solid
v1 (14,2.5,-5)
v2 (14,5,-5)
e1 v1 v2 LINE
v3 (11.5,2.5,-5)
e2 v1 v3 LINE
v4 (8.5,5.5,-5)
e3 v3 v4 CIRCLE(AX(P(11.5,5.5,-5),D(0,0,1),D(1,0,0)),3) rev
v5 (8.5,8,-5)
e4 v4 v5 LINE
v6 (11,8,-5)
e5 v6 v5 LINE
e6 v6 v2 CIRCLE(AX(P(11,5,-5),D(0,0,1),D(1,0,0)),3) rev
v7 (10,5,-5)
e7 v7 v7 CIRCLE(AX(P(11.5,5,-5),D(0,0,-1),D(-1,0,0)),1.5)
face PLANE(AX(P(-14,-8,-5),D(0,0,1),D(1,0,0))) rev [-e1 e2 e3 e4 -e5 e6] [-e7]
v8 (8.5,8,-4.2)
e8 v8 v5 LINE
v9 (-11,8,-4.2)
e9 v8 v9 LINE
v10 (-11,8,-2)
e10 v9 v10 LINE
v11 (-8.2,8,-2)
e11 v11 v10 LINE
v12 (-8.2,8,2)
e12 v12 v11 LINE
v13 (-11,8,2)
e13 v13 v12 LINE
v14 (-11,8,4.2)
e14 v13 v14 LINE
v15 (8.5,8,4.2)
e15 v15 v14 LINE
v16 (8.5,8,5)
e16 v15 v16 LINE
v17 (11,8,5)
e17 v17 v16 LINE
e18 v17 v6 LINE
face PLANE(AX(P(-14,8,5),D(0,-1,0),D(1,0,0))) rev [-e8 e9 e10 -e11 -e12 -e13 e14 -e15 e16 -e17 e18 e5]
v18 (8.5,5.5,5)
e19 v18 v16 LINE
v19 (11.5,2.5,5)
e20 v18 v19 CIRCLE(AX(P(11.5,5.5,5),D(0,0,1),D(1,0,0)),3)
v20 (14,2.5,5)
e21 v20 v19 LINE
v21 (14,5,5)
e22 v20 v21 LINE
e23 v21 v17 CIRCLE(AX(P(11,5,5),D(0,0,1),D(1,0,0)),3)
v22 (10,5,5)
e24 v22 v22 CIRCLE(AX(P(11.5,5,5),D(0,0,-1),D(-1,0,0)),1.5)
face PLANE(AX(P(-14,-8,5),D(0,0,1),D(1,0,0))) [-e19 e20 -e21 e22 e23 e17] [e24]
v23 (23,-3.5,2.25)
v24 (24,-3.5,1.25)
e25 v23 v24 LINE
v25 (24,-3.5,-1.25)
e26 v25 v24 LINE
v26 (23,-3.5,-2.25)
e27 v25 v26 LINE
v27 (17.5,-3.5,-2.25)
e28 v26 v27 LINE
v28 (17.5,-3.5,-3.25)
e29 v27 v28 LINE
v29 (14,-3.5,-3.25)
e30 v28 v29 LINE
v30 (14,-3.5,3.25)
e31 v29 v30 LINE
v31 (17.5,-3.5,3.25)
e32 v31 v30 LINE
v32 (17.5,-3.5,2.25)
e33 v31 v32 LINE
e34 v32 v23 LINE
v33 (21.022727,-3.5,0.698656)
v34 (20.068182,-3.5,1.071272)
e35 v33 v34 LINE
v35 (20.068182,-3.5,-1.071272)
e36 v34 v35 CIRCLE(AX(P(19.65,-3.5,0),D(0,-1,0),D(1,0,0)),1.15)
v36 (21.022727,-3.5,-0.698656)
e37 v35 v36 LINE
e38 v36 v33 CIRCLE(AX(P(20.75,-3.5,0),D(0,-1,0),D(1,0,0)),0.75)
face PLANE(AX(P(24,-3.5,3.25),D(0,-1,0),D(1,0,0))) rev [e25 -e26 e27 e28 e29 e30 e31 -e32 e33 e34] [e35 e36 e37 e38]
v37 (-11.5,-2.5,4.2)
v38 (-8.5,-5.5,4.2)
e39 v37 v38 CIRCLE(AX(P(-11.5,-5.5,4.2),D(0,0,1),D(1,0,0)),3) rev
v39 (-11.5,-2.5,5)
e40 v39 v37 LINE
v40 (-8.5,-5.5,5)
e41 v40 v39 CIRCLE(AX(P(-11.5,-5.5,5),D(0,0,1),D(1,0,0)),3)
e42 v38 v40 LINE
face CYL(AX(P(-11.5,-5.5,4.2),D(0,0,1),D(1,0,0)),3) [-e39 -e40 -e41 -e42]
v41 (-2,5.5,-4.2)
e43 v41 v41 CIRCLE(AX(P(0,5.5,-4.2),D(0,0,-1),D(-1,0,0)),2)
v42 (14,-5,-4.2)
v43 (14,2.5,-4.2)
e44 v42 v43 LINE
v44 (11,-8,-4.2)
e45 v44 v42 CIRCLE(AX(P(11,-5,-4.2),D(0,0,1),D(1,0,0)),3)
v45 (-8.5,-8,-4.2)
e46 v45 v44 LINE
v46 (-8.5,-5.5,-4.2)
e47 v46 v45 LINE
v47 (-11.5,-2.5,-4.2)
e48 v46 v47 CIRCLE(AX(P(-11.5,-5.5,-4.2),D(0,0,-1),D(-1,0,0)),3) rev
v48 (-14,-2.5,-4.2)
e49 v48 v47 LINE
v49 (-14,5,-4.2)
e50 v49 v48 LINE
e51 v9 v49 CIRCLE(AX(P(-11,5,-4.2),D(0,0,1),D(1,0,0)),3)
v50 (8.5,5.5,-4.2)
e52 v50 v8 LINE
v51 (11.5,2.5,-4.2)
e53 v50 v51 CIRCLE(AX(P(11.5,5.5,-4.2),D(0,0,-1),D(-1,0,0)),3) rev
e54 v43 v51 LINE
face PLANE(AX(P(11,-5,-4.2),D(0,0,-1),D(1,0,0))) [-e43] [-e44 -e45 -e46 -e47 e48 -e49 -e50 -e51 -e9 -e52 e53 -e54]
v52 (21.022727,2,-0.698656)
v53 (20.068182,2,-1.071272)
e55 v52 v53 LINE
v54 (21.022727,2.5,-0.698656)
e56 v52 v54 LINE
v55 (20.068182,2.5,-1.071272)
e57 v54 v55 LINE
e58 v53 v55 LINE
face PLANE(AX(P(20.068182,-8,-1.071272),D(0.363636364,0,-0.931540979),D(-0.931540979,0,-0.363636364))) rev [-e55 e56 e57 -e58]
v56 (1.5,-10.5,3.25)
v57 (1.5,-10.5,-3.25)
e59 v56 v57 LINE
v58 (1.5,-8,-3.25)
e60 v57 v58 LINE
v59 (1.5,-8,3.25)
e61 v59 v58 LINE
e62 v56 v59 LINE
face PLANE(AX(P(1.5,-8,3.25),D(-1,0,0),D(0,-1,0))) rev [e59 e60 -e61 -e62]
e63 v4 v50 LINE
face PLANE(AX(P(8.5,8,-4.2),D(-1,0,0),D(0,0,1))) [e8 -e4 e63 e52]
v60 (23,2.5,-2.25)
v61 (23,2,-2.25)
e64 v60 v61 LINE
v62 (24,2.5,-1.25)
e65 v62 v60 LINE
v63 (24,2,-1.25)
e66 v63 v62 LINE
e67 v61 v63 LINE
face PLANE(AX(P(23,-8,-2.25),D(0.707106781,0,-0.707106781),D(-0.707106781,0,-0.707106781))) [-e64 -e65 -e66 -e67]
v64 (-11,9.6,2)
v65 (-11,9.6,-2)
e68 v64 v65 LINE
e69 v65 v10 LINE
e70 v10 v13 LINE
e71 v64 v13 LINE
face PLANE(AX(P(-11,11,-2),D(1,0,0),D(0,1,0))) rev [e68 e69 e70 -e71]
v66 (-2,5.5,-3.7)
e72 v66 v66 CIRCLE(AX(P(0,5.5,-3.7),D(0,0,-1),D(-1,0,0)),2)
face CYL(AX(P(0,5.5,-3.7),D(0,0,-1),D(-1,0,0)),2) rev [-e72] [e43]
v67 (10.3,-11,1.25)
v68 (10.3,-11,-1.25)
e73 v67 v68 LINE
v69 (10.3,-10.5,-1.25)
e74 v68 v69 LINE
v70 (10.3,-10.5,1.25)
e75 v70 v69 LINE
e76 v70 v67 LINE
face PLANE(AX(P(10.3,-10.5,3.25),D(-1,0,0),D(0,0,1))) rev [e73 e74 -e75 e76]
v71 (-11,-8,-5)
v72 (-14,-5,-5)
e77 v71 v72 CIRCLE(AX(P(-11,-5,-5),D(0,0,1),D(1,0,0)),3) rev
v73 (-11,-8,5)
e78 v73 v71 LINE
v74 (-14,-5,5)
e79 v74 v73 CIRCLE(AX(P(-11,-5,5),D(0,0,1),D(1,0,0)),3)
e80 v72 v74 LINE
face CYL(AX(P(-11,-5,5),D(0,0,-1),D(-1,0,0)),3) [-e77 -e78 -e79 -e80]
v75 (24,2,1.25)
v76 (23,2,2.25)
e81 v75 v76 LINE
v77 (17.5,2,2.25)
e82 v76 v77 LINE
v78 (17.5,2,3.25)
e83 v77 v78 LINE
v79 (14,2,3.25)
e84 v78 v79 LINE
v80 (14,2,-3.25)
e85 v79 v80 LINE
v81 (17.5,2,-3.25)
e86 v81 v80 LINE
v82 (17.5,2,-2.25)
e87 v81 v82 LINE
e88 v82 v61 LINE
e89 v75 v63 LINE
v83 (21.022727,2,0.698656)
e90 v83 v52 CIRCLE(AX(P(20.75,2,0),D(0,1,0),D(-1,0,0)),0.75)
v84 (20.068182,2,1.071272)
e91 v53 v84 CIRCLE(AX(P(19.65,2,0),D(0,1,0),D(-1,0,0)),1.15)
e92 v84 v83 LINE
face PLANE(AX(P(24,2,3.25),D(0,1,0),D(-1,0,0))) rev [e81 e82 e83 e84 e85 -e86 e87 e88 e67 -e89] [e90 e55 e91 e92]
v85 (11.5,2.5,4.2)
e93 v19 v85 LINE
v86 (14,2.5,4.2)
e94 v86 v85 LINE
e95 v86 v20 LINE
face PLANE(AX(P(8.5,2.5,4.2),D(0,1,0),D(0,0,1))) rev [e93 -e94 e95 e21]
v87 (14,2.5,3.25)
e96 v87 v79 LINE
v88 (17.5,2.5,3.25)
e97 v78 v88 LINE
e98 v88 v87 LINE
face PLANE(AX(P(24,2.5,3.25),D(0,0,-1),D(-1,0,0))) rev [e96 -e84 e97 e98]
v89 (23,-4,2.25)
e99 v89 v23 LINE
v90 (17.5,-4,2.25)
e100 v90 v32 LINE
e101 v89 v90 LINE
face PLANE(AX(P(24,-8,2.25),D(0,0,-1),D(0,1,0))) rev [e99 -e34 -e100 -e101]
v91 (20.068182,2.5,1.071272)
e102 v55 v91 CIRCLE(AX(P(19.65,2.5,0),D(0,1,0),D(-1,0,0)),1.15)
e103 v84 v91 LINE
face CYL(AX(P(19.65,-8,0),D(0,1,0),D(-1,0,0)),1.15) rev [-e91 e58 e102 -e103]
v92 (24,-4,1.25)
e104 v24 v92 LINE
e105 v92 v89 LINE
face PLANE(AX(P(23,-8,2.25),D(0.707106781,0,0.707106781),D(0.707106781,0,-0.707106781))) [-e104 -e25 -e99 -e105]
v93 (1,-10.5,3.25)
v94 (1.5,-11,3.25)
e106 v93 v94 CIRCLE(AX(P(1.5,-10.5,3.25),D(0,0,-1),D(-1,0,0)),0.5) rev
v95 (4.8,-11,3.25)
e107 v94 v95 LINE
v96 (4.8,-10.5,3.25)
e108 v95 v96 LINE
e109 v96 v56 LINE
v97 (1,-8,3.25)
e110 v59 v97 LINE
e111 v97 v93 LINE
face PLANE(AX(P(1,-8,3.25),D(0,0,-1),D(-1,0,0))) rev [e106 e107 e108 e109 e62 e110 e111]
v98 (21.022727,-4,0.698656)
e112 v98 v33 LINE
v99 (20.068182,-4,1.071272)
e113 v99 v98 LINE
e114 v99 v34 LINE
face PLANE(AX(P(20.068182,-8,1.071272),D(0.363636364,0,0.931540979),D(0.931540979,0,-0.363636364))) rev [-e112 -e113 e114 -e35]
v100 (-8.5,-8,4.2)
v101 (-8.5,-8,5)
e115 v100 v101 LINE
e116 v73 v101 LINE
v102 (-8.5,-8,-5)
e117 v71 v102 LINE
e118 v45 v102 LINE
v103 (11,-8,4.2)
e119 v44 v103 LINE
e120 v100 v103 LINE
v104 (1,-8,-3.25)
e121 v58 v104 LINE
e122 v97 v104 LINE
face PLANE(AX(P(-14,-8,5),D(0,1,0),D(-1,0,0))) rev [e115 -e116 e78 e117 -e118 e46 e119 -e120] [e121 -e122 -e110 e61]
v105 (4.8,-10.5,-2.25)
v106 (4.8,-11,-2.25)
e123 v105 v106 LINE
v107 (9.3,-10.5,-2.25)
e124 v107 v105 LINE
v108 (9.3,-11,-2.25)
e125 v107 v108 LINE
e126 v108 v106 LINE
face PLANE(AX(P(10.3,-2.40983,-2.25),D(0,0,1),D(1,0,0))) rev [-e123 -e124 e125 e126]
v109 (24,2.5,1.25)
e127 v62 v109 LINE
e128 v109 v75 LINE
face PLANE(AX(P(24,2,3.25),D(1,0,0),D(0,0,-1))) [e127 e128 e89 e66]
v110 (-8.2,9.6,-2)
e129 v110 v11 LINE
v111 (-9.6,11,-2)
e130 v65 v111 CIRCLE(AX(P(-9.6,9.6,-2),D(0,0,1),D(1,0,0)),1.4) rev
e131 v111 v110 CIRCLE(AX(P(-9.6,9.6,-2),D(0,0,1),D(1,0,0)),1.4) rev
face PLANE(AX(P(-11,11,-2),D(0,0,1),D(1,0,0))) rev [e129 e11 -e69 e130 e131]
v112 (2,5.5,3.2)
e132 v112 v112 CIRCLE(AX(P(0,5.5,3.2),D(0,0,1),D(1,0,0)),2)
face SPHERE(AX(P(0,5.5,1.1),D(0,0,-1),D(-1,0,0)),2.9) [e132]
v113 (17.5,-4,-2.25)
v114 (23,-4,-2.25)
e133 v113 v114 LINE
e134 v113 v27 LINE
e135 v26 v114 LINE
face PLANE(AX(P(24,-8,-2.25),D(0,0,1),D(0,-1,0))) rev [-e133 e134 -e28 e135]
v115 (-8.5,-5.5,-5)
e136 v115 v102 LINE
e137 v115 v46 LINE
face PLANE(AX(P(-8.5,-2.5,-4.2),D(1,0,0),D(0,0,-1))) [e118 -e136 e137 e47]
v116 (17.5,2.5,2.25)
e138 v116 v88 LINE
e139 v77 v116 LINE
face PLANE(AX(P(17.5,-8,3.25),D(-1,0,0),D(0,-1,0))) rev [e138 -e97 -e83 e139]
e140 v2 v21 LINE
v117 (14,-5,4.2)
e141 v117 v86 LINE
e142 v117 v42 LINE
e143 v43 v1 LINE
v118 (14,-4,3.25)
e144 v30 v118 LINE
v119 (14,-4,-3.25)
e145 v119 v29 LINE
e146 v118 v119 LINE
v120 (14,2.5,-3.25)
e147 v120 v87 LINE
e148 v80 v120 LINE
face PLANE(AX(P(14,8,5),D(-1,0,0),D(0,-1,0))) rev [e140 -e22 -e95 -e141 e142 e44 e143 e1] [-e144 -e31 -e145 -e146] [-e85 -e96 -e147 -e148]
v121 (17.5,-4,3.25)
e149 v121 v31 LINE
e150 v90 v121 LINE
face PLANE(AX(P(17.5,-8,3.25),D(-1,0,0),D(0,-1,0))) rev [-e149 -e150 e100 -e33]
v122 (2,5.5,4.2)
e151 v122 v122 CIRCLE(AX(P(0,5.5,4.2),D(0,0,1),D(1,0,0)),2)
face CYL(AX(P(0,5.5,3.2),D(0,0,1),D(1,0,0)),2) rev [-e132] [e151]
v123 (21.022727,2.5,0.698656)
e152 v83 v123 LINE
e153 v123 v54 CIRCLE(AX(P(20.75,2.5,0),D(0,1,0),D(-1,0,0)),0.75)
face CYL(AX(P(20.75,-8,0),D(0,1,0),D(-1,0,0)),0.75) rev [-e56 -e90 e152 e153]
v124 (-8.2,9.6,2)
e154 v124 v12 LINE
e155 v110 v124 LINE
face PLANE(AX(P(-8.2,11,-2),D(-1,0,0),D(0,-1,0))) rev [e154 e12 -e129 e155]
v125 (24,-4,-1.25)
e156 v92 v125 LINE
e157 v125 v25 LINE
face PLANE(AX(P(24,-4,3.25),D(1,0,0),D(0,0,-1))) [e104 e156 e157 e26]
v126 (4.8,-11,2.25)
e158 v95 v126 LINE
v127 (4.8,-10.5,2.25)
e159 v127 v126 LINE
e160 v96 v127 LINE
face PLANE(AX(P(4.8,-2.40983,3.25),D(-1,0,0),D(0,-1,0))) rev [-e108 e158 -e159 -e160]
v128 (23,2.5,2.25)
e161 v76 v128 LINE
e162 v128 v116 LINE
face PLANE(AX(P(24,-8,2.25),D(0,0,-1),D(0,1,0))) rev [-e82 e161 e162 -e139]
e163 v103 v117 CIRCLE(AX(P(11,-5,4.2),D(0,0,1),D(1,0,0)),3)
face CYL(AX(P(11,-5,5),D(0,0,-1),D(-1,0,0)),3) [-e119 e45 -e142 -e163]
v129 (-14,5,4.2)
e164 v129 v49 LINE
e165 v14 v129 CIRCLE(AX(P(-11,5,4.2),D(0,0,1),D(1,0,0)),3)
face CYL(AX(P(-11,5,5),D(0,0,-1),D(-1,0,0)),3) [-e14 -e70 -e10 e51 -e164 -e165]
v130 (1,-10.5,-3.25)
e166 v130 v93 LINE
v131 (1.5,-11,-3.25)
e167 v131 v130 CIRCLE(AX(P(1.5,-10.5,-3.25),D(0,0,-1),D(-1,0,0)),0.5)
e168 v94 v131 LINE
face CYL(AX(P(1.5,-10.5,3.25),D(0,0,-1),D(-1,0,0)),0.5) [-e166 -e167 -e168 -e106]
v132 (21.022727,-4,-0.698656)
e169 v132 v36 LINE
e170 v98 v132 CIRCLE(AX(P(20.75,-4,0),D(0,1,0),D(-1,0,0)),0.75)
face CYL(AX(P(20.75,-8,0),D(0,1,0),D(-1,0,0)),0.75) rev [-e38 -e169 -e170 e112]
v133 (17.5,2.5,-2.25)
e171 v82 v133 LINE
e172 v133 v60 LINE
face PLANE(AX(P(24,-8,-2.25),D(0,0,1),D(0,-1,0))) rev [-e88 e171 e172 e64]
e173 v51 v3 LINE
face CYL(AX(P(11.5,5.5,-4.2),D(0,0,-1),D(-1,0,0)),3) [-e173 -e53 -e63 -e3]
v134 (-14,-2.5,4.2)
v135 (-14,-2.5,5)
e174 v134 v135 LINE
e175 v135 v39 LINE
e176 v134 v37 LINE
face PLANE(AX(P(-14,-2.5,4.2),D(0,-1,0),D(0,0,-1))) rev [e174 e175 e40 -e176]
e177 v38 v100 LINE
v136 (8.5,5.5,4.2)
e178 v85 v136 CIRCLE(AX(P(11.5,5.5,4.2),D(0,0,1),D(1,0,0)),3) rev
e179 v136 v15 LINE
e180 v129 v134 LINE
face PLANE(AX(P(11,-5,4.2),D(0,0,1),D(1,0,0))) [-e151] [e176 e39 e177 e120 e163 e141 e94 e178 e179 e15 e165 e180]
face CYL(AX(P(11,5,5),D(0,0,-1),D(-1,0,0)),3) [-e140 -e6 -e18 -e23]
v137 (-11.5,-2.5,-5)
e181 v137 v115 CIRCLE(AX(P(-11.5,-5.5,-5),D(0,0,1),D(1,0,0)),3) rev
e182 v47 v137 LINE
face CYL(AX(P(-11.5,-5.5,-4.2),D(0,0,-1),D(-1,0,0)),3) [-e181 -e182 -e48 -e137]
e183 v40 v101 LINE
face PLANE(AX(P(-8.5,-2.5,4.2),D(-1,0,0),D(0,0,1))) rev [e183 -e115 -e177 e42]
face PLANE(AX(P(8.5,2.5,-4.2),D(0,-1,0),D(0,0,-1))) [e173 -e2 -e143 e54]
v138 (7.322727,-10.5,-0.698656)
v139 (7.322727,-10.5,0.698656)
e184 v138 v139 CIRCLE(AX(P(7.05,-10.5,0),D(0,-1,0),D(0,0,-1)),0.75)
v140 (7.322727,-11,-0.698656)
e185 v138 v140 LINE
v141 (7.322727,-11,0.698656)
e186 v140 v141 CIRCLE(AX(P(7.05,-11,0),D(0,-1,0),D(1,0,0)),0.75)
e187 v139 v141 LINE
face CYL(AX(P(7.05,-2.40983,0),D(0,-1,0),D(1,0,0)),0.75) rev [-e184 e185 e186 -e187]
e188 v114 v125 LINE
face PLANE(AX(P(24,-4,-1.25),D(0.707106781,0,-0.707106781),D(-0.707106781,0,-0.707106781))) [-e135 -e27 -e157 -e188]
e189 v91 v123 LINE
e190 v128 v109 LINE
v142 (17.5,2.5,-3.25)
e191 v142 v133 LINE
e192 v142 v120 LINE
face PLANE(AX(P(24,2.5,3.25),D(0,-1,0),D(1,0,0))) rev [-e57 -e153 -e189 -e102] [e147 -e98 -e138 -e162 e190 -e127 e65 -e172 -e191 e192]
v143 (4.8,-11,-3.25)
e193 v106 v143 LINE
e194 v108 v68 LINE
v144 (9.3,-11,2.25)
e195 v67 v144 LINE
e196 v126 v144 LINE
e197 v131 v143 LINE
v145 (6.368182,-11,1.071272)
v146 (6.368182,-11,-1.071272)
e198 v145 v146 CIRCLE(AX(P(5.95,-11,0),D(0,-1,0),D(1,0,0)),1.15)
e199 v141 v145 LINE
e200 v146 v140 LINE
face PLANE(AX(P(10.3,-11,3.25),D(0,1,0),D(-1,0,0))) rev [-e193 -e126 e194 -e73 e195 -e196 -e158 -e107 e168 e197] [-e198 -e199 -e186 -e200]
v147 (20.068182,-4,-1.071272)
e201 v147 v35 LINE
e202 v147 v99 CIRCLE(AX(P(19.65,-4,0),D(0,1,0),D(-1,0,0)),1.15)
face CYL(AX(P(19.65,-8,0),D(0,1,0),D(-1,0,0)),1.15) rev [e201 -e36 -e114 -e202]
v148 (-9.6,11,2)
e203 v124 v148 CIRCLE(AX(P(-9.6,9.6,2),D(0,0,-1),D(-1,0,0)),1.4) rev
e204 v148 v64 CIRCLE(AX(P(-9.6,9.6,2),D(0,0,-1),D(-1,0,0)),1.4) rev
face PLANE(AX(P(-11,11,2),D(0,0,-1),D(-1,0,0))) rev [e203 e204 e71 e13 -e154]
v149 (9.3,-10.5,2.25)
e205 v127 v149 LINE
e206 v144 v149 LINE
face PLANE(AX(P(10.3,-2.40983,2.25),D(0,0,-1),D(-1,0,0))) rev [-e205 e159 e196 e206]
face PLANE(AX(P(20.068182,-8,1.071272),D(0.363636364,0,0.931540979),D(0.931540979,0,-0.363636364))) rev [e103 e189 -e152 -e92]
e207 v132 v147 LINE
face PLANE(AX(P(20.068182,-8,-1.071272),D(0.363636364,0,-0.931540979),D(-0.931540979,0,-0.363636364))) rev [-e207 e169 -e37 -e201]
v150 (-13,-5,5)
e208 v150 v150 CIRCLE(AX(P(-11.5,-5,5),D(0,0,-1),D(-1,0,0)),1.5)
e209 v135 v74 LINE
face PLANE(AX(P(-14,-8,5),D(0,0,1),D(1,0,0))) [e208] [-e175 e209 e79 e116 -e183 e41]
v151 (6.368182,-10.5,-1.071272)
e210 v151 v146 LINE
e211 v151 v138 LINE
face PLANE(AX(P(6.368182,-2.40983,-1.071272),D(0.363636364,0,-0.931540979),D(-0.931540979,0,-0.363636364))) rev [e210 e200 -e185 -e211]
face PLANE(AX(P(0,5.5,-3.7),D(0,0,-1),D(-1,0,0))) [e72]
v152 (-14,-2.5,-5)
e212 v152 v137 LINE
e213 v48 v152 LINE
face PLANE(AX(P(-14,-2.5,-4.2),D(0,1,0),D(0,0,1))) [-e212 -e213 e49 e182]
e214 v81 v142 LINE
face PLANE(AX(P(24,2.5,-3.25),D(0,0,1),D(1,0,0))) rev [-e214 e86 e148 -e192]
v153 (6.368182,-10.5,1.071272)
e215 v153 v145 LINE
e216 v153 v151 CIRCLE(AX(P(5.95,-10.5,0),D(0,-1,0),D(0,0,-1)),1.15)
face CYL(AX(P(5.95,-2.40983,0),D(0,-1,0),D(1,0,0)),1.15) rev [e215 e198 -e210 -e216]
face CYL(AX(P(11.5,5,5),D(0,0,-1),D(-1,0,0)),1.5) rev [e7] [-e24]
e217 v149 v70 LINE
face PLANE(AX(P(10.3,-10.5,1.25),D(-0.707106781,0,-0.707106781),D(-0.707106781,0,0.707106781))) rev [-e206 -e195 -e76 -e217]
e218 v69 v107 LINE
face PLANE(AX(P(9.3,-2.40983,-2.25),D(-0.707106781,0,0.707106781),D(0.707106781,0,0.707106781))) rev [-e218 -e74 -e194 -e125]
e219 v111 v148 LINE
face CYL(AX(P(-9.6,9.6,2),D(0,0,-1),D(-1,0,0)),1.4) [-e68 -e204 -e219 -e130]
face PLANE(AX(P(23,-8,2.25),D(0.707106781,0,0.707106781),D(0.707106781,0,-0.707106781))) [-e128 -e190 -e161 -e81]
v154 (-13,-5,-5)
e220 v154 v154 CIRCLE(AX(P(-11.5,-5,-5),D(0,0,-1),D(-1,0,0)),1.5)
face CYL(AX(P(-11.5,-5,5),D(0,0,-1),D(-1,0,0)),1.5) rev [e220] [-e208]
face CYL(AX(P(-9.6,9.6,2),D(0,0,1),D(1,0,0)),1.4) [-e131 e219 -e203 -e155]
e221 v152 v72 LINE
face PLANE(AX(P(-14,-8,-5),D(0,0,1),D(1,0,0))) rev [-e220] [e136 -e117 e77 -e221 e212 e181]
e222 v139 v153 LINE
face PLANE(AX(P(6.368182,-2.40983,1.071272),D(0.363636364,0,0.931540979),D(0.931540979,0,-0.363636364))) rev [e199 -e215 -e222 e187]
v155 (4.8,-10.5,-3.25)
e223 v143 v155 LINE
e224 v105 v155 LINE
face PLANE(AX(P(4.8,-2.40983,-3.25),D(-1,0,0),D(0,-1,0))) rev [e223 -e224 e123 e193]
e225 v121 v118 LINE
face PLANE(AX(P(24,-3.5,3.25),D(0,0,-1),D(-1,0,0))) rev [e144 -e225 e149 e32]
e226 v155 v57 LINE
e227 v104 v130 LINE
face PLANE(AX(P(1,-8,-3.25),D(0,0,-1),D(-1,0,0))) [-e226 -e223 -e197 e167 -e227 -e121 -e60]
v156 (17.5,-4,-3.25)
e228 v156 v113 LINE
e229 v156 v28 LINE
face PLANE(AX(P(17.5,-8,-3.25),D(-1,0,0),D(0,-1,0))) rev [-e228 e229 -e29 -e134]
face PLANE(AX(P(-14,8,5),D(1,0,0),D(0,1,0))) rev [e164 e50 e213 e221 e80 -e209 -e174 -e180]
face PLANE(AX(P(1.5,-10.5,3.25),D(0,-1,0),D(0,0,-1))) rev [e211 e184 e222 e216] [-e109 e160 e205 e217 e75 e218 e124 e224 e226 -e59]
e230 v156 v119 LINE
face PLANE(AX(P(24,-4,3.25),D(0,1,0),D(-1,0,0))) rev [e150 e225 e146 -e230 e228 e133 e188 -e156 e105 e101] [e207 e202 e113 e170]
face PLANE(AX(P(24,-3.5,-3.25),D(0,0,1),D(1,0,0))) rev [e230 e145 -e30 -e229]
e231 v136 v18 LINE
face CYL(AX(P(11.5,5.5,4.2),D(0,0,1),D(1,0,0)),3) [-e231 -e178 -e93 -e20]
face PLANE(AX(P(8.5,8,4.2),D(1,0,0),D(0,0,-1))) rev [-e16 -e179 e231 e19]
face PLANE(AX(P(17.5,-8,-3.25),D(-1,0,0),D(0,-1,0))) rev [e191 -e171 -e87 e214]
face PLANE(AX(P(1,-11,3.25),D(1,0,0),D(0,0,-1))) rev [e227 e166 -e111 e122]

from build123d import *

# Parameters (mm, degrees)
SKETCH_1_W             = 28
SKETCH_1_H             = 16
EXTRUDE_1_DEPTH        = 5
FILLET_1_R             = 3
CUT_EXTRUDE_2_DEPTH    = 0.8
FILLET_2_R             = 3
FILLET_2_OF_MIRROR_1_R = 3
SKETCH_3_R             = 1.5
CUT_EXTRUDE_3_DEPTH    = 19.973665961
SKETCH_4_R             = 2
CUT_EXTRUDE_4_DEPTH    = 0.5
CUT_EXTRUDE_START      = -1
SKETCH_5_R             = 2
CUT_EXTRUDE_5_DEPTH    = 1
SKETCH_10_W            = 6.5
SKETCH_10_H            = 0.5
EXTRUDE_9_DEPTH        = 10
SKETCH_11_W            = 6.5
SKETCH_11_H            = 1
CUT_EXTRUDE_10_DEPTH   = 27.669270706
CHAMFER_1_SIZE         = 1
EXTRUDE_11_DEPTH       = 3.25
FILLET_7_R             = 0.5
SKETCH_13_W            = 5.5
SKETCH_13_H            = 1
CUT_EXTRUDE_12_DEPTH   = 3
CHAMFER_2_SIZE         = 1
SKETCH_14_W            = 2.8
SKETCH_14_H            = 4
EXTRUDE_13_DEPTH       = 3
FILLET_8_R             = 1.4


with BuildPart() as part:
    # 草圖1 → 伸長1 (new, symmetric)
    with BuildSketch(Plane.XY):
        Rectangle(SKETCH_1_W, SKETCH_1_H)
    extrude(amount=EXTRUDE_1_DEPTH, both=True)

    # 圓角1
    fillet_1_edges = [part.edges().sort_by_distance(p)[0] for p in [
        (-14, 8, 0),
        (14, 8, 0),
        (14, -8, 0),
        (-14, -8, 0),
    ]]
    fillet(fillet_1_edges, radius=FILLET_1_R)

    # 草圖2 → 伸長2 (cut)
    with BuildSketch(Plane.XY.offset(5)):
        with BuildLine():
            Line((-14, -2.5), (-8.5, -2.5))
            Line((-8.5, -2.5), (-8.5, -8))
            Line((-8.5, -8), (11, -8))
            ThreePointArc((11, -8), (13.121320344, -7.121320344), (14, -5))
            Line((14, -5), (14, 2.5))
            Line((14, 2.5), (8.5, 2.5))
            Line((8.5, 2.5), (8.5, 8))
            Line((8.5, 8), (-11, 8))
            ThreePointArc((-11, 8), (-13.121320344, 7.121320344), (-14, 5))
            Line((-14, 5), (-14, -2.5))
        make_face()
    cut_extrude_2 = extrude(amount=-CUT_EXTRUDE_2_DEPTH, mode=Mode.SUBTRACT)

    # 圓角2
    fillet_2_edges = [part.edges().sort_by_distance(p)[0] for p in [
        (8.5, 2.5, 4.6),
        (-8.5, -2.5, 4.6),
    ]]
    fillet(fillet_2_edges, radius=FILLET_2_R)

    # 鏡射1: 伸長2 across plane
    add(cut_extrude_2.mirror(Plane.XY), mode=Mode.SUBTRACT)

    # 圓角2 of 鏡射1
    fillet_2_of_mirror_1_edges = [part.edges().sort_by_distance(p)[0] for p in [
        (8.5, 2.5, -4.6),
        (-8.5, -2.5, -4.6),
    ]]
    fillet(fillet_2_of_mirror_1_edges, radius=FILLET_2_OF_MIRROR_1_R)

    # 草圖3 → 伸長3 (cut, through all)
    with BuildSketch(Plane(origin=(0, 0, -5), x_dir=(-1, 0, 0), z_dir=(0, 0, -1))):
        with Locations((-11.5, 5)):
            Circle(SKETCH_3_R)
        with Locations((11.5, -5)):
            Circle(SKETCH_3_R)
    extrude(amount=-CUT_EXTRUDE_3_DEPTH, mode=Mode.SUBTRACT)

    # 草圖4 → 伸長4 (cut)
    with BuildSketch(Plane(origin=(0, 0, -4.2), x_dir=(-1, 0, 0), z_dir=(0, 0, -1))):
        with Locations((0, 5.5)):
            Circle(SKETCH_4_R)
    extrude(amount=-CUT_EXTRUDE_4_DEPTH, mode=Mode.SUBTRACT)

    # 草圖5 → 伸長5 (cut)
    with BuildSketch(Plane.XY.offset(4.2).offset(CUT_EXTRUDE_START)):
        with Locations(Location((0, 5.5, 0), (0, 0, 180))):
            Circle(SKETCH_5_R)
    extrude(amount=CUT_EXTRUDE_5_DEPTH, mode=Mode.SUBTRACT)

    # 草圖9 → 旋轉1 (revolve)
    with BuildSketch(Plane(origin=(0, 5.5, 0), x_dir=(-1, 0, 0), z_dir=(0, 1, 0)), mode=Mode.PRIVATE) as revolve_1_sk:
        with BuildLine():
            Line((0, 3.2), (2, 3.2))
            ThreePointArc((2, 3.2), (1.077032961, 3.792582404), (0, 4))
            Line((0, 4), (0, 3.2))
        make_face()
    revolve(revolve_1_sk.sketch.rotate(Axis((0, 5.5, 3.2), (0, 0, 1)), 180), axis=Axis((0, 5.5, 3.2), (0, 0, 1)))

    # 草圖10 → 伸長9 (add)
    with BuildSketch(Plane(origin=(14, 0, 0), x_dir=(0, 0, -1), z_dir=(1, 0, 0))):
        with Locations((0, -3.75)):
            Rectangle(SKETCH_10_W, SKETCH_10_H)
        with Locations((0, 2.25)):
            Rectangle(SKETCH_10_W, SKETCH_10_H)
    extrude(amount=EXTRUDE_9_DEPTH)

    # 草圖11 → 伸長10 (cut, through all)
    with BuildSketch(Plane(origin=(0, 2.5, 0), x_dir=(1, 0, 0), z_dir=(0, 1, 0))):
        with BuildLine():
            Line((20.068181818, 1.071272126), (21.022727273, 0.698655734))
            ThreePointArc((21.022727273, 0.698655734), (21.5, 0), (21.022727273, -0.698655734))
            Line((21.022727273, -0.698655734), (20.068181818, -1.071272126))
            ThreePointArc((20.068181818, -1.071272126), (18.5, 0), (20.068181818, 1.071272126))
        make_face()
        with Locations((20.75, 2.75)):
            Rectangle(SKETCH_11_W, SKETCH_11_H)
        with Locations((20.75, -2.75)):
            Rectangle(SKETCH_11_W, SKETCH_11_H)
    extrude(amount=-CUT_EXTRUDE_10_DEPTH, mode=Mode.SUBTRACT)

    # 導角1
    chamfer_1_edges = [part.edges().sort_by_distance(p)[0] for p in [
        (24, 2.25, -2.25),
        (24, -3.75, -2.25),
        (24, 2.25, 2.25),
        (24, -3.75, 2.25),
    ]]
    chamfer(chamfer_1_edges, length=CHAMFER_1_SIZE)

    # 草圖12 → 伸長11 (add, symmetric)
    with BuildSketch(Plane.XY):
        Polygon((1, -8), (1.5, -8), (1.5, -10.5), (10.3, -10.5), (10.3, -11), (1, -11), align=None)
    extrude(amount=EXTRUDE_11_DEPTH, both=True)

    # 圓角7
    fillet_7_edges = [part.edges().sort_by_distance(p)[0] for p in [
        (1, -11, 0),
    ]]
    fillet(fillet_7_edges, radius=FILLET_7_R)

    # 草圖13 → 伸長12 (cut)
    with BuildSketch(Plane.XZ.offset(11)):
        with Locations((7.55, 2.75)):
            Rectangle(SKETCH_13_W, SKETCH_13_H)
        with Locations((7.55, -2.75)):
            Rectangle(SKETCH_13_W, SKETCH_13_H)
        with BuildLine():
            Line((6.368181818, 1.071272126), (7.322727273, 0.698655734))
            ThreePointArc((7.322727273, 0.698655734), (7.8, 0), (7.322727273, -0.698655734))
            Line((7.322727273, -0.698655734), (6.368181818, -1.071272126))
            ThreePointArc((6.368181818, -1.071272126), (4.8, 0), (6.368181818, 1.071272126))
        make_face()
    extrude(amount=-CUT_EXTRUDE_12_DEPTH, mode=Mode.SUBTRACT)

    # 導角2
    chamfer_2_edges = [part.edges().sort_by_distance(p)[0] for p in [
        (10.3, -10.75, 2.25),
        (10.3, -10.75, -2.25),
    ]]
    chamfer(chamfer_2_edges, length=CHAMFER_2_SIZE)

    # 草圖14 → 伸長13 (add)
    with BuildSketch(Plane(origin=(0, 8, 0), x_dir=(1, 0, 0), z_dir=(0, 1, 0))):
        with Locations((-9.6, 0)):
            Rectangle(SKETCH_14_W, SKETCH_14_H)
    extrude(amount=EXTRUDE_13_DEPTH)

    # 圓角8
    fillet_8_edges = [part.edges().sort_by_distance(p)[0] for p in [
        (-8.2, 11, 0),
        (-11, 11, 0),
    ]]
    fillet(fillet_8_edges, radius=FILLET_8_R - 0.0001)  # a hair under: the kernel refuses the full size


solid = part.part
